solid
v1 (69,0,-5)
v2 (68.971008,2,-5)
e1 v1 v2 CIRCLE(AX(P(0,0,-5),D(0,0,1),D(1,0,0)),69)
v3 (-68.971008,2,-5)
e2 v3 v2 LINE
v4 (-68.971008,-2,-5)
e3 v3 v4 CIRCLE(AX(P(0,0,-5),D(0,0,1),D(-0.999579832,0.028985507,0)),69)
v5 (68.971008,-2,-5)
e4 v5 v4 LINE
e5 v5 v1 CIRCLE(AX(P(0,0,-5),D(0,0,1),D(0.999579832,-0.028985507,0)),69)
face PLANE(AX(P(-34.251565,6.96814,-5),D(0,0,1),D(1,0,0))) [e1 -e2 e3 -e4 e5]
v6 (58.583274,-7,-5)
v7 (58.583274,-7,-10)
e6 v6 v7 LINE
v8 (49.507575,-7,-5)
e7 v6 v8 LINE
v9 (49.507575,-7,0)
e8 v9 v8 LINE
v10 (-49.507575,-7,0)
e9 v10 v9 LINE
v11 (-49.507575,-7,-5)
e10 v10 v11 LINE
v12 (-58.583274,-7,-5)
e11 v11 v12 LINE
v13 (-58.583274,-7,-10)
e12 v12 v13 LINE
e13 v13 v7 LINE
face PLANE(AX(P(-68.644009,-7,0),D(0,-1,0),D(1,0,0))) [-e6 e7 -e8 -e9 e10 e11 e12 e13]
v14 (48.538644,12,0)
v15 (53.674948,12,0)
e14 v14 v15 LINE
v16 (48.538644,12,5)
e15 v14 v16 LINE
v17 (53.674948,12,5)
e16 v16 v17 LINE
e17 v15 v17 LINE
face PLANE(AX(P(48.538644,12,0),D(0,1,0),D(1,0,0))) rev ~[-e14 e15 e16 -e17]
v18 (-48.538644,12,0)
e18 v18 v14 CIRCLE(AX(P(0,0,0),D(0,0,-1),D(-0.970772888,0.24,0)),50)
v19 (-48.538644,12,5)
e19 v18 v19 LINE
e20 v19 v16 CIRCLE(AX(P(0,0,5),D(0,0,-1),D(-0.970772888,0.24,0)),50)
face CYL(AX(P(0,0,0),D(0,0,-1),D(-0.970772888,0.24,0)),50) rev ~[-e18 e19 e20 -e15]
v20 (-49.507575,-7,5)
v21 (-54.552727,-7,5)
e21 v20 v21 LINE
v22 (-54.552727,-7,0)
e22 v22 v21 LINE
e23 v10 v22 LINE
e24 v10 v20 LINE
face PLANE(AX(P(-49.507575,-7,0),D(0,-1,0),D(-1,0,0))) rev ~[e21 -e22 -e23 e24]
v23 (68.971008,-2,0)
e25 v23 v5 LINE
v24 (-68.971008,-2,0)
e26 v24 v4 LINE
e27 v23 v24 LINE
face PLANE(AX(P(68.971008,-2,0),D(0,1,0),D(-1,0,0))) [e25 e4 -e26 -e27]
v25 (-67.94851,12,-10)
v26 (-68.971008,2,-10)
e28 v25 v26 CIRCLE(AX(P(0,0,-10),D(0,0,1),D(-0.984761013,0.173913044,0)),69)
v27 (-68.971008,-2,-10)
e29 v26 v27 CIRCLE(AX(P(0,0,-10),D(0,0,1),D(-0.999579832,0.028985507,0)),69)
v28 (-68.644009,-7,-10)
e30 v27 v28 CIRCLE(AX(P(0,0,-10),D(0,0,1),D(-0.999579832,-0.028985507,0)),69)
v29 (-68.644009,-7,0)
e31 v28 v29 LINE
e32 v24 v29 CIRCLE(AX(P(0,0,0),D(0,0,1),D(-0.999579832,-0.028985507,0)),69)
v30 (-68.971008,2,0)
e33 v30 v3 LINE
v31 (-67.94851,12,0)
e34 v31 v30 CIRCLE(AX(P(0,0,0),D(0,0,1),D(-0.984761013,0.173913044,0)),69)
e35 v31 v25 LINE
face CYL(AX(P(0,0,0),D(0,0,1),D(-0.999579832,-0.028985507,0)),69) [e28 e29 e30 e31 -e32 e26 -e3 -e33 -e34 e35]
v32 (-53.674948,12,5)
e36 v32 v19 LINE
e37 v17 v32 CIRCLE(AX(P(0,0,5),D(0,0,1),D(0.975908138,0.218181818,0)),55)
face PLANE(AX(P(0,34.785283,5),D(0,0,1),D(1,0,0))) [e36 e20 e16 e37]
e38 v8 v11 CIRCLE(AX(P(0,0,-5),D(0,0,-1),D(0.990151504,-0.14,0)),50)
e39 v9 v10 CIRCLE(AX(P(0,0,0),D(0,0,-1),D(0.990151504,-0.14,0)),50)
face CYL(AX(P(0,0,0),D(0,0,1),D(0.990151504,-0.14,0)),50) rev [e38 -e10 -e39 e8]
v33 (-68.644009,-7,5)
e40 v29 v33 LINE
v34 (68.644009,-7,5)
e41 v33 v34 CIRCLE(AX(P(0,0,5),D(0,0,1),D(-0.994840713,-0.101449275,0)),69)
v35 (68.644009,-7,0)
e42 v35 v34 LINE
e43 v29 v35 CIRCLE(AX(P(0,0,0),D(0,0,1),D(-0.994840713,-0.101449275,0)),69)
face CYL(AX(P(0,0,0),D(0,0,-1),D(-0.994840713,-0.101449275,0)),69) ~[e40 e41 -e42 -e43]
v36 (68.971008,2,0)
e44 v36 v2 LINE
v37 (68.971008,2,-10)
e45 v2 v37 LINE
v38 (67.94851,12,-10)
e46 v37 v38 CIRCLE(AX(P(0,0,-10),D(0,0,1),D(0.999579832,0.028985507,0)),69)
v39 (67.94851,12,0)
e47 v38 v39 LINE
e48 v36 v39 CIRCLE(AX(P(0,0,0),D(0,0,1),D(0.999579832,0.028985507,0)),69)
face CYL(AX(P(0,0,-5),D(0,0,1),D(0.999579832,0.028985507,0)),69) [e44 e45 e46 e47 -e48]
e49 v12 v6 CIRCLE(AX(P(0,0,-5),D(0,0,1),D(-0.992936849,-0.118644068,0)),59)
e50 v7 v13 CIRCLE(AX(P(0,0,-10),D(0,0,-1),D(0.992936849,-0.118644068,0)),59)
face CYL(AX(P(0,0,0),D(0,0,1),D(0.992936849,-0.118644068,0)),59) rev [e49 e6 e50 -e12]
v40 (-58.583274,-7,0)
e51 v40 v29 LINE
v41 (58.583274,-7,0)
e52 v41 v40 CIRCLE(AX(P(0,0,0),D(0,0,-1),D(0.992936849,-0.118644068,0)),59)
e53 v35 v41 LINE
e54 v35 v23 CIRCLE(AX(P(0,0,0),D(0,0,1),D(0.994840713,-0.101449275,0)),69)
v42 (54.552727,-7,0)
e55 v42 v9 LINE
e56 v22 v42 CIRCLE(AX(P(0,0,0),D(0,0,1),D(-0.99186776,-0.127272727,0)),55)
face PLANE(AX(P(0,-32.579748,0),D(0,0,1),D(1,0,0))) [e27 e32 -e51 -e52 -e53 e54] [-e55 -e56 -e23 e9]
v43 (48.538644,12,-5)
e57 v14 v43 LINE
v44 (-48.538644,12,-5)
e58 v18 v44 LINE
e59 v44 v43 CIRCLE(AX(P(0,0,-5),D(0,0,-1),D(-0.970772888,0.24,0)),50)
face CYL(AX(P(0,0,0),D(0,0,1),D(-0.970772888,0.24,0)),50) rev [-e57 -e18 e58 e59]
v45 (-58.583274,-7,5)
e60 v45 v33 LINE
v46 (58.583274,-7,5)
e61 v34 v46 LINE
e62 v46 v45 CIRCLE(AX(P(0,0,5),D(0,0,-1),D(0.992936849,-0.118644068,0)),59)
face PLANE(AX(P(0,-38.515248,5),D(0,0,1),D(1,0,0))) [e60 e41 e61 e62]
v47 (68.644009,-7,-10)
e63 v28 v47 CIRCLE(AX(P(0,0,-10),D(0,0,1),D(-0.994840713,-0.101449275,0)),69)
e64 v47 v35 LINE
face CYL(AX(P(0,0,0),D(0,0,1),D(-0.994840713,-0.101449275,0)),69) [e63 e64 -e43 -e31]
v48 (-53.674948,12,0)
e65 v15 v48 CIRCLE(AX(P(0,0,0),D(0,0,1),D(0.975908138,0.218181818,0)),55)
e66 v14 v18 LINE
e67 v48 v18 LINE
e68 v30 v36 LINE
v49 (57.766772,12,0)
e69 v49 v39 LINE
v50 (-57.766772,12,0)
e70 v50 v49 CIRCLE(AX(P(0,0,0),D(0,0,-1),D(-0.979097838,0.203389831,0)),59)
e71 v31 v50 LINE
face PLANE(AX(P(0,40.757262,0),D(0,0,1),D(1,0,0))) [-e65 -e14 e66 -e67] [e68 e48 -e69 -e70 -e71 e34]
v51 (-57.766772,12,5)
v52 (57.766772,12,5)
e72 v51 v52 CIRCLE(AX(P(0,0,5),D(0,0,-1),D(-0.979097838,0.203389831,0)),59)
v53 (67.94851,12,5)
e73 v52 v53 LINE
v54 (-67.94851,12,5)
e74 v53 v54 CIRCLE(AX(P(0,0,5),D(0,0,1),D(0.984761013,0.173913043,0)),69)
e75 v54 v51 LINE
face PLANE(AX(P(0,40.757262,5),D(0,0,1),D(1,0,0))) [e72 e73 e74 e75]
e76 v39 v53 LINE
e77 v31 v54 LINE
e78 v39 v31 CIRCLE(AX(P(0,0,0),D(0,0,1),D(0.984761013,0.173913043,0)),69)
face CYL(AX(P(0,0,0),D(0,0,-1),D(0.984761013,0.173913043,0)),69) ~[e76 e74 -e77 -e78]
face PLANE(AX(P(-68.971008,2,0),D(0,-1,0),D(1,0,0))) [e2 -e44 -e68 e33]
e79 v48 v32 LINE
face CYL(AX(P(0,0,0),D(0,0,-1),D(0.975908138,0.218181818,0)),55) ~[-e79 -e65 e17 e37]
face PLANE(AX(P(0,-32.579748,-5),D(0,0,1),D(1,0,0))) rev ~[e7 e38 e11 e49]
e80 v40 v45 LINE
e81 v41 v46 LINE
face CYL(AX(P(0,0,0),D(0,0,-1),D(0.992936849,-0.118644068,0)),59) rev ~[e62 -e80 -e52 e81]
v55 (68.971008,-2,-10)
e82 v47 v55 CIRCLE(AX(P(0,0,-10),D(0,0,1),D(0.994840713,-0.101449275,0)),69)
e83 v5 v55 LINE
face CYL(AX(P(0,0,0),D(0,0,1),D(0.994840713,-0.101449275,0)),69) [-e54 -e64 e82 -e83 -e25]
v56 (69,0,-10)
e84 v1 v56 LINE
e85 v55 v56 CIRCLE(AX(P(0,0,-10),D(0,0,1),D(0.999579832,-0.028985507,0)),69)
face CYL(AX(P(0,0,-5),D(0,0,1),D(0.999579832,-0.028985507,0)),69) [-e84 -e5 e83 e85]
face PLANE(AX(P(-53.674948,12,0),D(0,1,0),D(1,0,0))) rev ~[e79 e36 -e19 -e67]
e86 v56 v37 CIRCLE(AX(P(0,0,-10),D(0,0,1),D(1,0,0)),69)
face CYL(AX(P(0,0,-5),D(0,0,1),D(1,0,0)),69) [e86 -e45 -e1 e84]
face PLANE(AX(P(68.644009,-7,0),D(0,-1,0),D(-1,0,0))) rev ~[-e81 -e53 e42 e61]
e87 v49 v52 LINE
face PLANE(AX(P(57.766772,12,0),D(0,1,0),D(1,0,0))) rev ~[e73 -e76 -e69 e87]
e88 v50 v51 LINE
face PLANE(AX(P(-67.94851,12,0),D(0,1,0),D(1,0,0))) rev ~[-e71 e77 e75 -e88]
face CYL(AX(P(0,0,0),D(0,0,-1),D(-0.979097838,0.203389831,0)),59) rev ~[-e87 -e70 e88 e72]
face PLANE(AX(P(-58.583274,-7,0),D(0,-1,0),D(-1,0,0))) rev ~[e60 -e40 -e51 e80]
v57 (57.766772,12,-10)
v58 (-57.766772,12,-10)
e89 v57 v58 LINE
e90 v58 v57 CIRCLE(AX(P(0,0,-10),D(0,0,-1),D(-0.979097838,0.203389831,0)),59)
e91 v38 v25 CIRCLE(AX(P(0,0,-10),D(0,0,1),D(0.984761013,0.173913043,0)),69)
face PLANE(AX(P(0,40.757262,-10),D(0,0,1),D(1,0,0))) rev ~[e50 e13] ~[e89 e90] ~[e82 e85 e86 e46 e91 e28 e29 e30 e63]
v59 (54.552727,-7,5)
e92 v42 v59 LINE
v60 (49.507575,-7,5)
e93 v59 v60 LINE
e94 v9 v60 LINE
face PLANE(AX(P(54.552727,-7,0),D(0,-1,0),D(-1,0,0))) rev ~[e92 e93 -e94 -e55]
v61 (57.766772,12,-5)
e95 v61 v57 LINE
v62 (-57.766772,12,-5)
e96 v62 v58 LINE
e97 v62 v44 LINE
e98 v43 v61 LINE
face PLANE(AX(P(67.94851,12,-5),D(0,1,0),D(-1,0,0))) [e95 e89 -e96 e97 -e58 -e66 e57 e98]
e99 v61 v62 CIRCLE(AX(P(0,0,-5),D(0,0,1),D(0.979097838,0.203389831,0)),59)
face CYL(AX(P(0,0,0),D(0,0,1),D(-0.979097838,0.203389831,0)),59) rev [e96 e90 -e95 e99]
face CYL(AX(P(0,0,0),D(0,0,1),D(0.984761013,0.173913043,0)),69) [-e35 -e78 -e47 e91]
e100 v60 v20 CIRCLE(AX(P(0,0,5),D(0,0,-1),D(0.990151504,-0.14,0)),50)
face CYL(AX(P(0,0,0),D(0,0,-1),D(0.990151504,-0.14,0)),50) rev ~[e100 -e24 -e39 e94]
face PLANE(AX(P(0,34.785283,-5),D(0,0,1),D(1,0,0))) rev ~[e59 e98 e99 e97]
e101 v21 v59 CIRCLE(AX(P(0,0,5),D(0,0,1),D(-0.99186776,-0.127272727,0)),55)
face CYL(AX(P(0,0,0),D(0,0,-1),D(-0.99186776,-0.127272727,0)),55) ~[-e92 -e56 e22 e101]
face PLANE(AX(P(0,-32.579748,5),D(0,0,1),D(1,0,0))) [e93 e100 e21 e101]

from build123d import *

# Parameters (mm, degrees)
F1_START = -5
F1_DEPTH = 5
F2_DEPTH = 5
F3_DEPTH = 10
F4_DEPTH = 5
F5_DEPTH = 5


# Not quite as in the source:
# - after a boolean that leaves OpenCascade's solid faulty, fix() repairs it
# - a feature names something its author has since deleted; it is built from what else it names


with BuildPart() as f1:
    # F0 (on Top) → F1 (new body)
    with BuildSketch(Plane.XY.offset(F1_START)):
        with BuildLine():
            Line((0, 12), (-48.538644398, 12))
            Line((-48.538644398, 12), (-53.6749476013, 12))
            Line((-53.6749476013, 12), (-57.7667724561, 12))
            Line((-57.7667724561, 12), (-67.9485099174, 12))
            ThreePointArc((-67.9485099174, 12), (-68.6421053306, 7.0186448683), (-68.9710084021, 2))
            Line((-68.9710084021, 2), (0, 2))
            Line((0, 2), (0, 12))
        make_face()
        with BuildLine():
            Line((0, -7), (0, -2))
            Line((0, -2), (-68.9710084021, -2))
            ThreePointArc((-68.9710084021, -2), (-68.8529103806, -4.5029692558), (-68.6440092069, -7))
            Line((-68.6440092069, -7), (-58.5832740635, -7))
            Line((-58.5832740635, -7), (-54.5527267879, -7))
            Line((-54.5527267879, -7), (-49.5075751779, -7))
            Line((-49.5075751779, -7), (0, -7))
        make_face()
        with BuildLine():
            Line((68.9710084021, -2), (0, -2))
            Line((0, -2), (0, -7))
            Line((0, -7), (49.5075751779, -7))
            Line((49.5075751779, -7), (54.5527267879, -7))
            Line((54.5527267879, -7), (58.5832740635, -7))
            Line((58.5832740635, -7), (68.6440092069, -7))
            ThreePointArc((68.6440092069, -7), (68.8529103806, -4.5029692558), (68.9710084021, -2))
        make_face()
        with BuildLine():
            Line((68.9710084021, 2), (0, 2))
            Line((0, 2), (0, 0))
            Line((0, 0), (0, -2))
            Line((0, -2), (68.9710084021, -2))
            ThreePointArc((68.9710084021, -2), (68.9927517198, -1.0001050586), (69, 0))
            ThreePointArc((69, 0), (68.9927517198, 1.0001050586), (68.9710084021, 2))
        make_face()
        with BuildLine():
            Line((53.6749476013, 12), (48.538644398, 12))
            Line((48.538644398, 12), (0, 12))
            Line((0, 12), (0, 2))
            Line((0, 2), (68.9710084021, 2))
            ThreePointArc((68.9710084021, 2), (68.6421053306, 7.0186448683), (67.9485099174, 12))
            Line((67.9485099174, 12), (57.7667724561, 12))
            Line((57.7667724561, 12), (53.6749476013, 12))
        make_face()
        with BuildLine():
            Line((0, 0), (0, 2))
            Line((0, 2), (-68.9710084021, 2))
            ThreePointArc((-68.9710084021, 2), (-69, 0), (-68.9710084021, -2))
            Line((-68.9710084021, -2), (0, -2))
            Line((0, -2), (0, 0))
        make_face()
    extrude(amount=-F1_DEPTH)

    # F0 (on Top) → F2 (join)
    with BuildSketch(Plane.XY):
        with BuildLine():
            Line((0, -7), (0, -2))
            Line((0, -2), (-68.9710084021, -2))
            ThreePointArc((-68.9710084021, -2), (-68.8529103806, -4.5029692558), (-68.6440092069, -7))
            Line((-68.6440092069, -7), (-58.5832740635, -7))
            Line((-58.5832740635, -7), (-54.5527267879, -7))
            Line((-54.5527267879, -7), (-49.5075751779, -7))
            Line((-49.5075751779, -7), (0, -7))
        make_face()
        with BuildLine():
            Line((0, 12), (-48.538644398, 12))
            Line((-48.538644398, 12), (-53.6749476013, 12))
            Line((-53.6749476013, 12), (-57.7667724561, 12))
            Line((-57.7667724561, 12), (-67.9485099174, 12))
            ThreePointArc((-67.9485099174, 12), (-68.6421053306, 7.0186448683), (-68.9710084021, 2))
            Line((-68.9710084021, 2), (0, 2))
            Line((0, 2), (0, 12))
        make_face()
        with BuildLine():
            Line((53.6749476013, 12), (48.538644398, 12))
            Line((48.538644398, 12), (0, 12))
            Line((0, 12), (0, 2))
            Line((0, 2), (68.9710084021, 2))
            ThreePointArc((68.9710084021, 2), (68.6421053306, 7.0186448683), (67.9485099174, 12))
            Line((67.9485099174, 12), (57.7667724561, 12))
            Line((57.7667724561, 12), (53.6749476013, 12))
        make_face()
        with BuildLine():
            Line((68.9710084021, -2), (0, -2))
            Line((0, -2), (0, -7))
            Line((0, -7), (49.5075751779, -7))
            Line((49.5075751779, -7), (54.5527267879, -7))
            Line((54.5527267879, -7), (58.5832740635, -7))
            Line((58.5832740635, -7), (68.6440092069, -7))
            ThreePointArc((68.6440092069, -7), (68.8529103806, -4.5029692558), (68.9710084021, -2))
        make_face()
    extrude(amount=-F2_DEPTH)

    # F0 (on Top) → F3 (join)
    with BuildSketch(Plane.XY):
        with BuildLine():
            ThreePointArc((-57.7667724561, 12), (0, 59), (57.7667724561, 12))
            Line((57.7667724561, 12), (67.9485099174, 12))
            ThreePointArc((67.9485099174, 12), (0, 69), (-67.9485099174, 12))
            Line((-67.9485099174, 12), (-57.7667724561, 12))
        make_face()
        with BuildLine():
            Line((-58.5832740635, -7), (-68.6440092069, -7))
            ThreePointArc((-68.6440092069, -7), (0, -69), (68.6440092069, -7))
            Line((68.6440092069, -7), (58.5832740635, -7))
            ThreePointArc((58.5832740635, -7), (0, -59), (-58.5832740635, -7))
        make_face()
    extrude(amount=-F3_DEPTH)

    # F0 (on Top) → F4 (join)
    with BuildSketch(Plane.XY):
        with BuildLine():
            Line((54.5527267879, -7), (49.5075751779, -7))
            ThreePointArc((49.5075751779, -7), (0, -50), (-49.5075751779, -7))
            Line((-49.5075751779, -7), (-54.5527267879, -7))
            ThreePointArc((-54.5527267879, -7), (0, -55), (54.5527267879, -7))
        make_face()
        with BuildLine():
            ThreePointArc((-48.538644398, 12), (0, 50), (48.538644398, 12))
            Line((48.538644398, 12), (53.6749476013, 12))
            ThreePointArc((53.6749476013, 12), (0, 55), (-53.6749476013, 12))
            Line((-53.6749476013, 12), (-48.538644398, 12))
        make_face()
        with BuildLine():
            ThreePointArc((-53.6749476013, 12), (0, 55), (53.6749476013, 12))
            Line((53.6749476013, 12), (57.7667724561, 12))
            ThreePointArc((57.7667724561, 12), (0, 59), (-57.7667724561, 12))
            Line((-57.7667724561, 12), (-53.6749476013, 12))
        make_face()
        with BuildLine():
            Line((-54.5527267879, -7), (-58.5832740635, -7))
            ThreePointArc((-58.5832740635, -7), (0, -59), (58.5832740635, -7))
            Line((58.5832740635, -7), (54.5527267879, -7))
            ThreePointArc((54.5527267879, -7), (0, -55), (-54.5527267879, -7))
        make_face()
    extrude(amount=-F4_DEPTH)

    # F0 (on Top) → F5 (join)
    with BuildSketch(Plane.XY):
        with BuildLine():
            ThreePointArc((-57.7667724561, 12), (0, 59), (57.7667724561, 12))
            Line((57.7667724561, 12), (67.9485099174, 12))
            ThreePointArc((67.9485099174, 12), (0, 69), (-67.9485099174, 12))
            Line((-67.9485099174, 12), (-57.7667724561, 12))
        make_face()
        with BuildLine():
            ThreePointArc((-48.538644398, 12), (0, 50), (48.538644398, 12))
            Line((48.538644398, 12), (53.6749476013, 12))
            ThreePointArc((53.6749476013, 12), (0, 55), (-53.6749476013, 12))
            Line((-53.6749476013, 12), (-48.538644398, 12))
        make_face()
        with BuildLine():
            Line((-58.5832740635, -7), (-68.6440092069, -7))
            ThreePointArc((-68.6440092069, -7), (0, -69), (68.6440092069, -7))
            Line((68.6440092069, -7), (58.5832740635, -7))
            ThreePointArc((58.5832740635, -7), (0, -59), (-58.5832740635, -7))
        make_face()
        with BuildLine():
            Line((54.5527267879, -7), (49.5075751779, -7))
            ThreePointArc((49.5075751779, -7), (0, -50), (-49.5075751779, -7))
            Line((-49.5075751779, -7), (-54.5527267879, -7))
            ThreePointArc((-54.5527267879, -7), (0, -55), (54.5527267879, -7))
        make_face()
    extrude(amount=F5_DEPTH)

    add(f1.part.fix(), mode=Mode.REPLACE)


solid = f1.part
